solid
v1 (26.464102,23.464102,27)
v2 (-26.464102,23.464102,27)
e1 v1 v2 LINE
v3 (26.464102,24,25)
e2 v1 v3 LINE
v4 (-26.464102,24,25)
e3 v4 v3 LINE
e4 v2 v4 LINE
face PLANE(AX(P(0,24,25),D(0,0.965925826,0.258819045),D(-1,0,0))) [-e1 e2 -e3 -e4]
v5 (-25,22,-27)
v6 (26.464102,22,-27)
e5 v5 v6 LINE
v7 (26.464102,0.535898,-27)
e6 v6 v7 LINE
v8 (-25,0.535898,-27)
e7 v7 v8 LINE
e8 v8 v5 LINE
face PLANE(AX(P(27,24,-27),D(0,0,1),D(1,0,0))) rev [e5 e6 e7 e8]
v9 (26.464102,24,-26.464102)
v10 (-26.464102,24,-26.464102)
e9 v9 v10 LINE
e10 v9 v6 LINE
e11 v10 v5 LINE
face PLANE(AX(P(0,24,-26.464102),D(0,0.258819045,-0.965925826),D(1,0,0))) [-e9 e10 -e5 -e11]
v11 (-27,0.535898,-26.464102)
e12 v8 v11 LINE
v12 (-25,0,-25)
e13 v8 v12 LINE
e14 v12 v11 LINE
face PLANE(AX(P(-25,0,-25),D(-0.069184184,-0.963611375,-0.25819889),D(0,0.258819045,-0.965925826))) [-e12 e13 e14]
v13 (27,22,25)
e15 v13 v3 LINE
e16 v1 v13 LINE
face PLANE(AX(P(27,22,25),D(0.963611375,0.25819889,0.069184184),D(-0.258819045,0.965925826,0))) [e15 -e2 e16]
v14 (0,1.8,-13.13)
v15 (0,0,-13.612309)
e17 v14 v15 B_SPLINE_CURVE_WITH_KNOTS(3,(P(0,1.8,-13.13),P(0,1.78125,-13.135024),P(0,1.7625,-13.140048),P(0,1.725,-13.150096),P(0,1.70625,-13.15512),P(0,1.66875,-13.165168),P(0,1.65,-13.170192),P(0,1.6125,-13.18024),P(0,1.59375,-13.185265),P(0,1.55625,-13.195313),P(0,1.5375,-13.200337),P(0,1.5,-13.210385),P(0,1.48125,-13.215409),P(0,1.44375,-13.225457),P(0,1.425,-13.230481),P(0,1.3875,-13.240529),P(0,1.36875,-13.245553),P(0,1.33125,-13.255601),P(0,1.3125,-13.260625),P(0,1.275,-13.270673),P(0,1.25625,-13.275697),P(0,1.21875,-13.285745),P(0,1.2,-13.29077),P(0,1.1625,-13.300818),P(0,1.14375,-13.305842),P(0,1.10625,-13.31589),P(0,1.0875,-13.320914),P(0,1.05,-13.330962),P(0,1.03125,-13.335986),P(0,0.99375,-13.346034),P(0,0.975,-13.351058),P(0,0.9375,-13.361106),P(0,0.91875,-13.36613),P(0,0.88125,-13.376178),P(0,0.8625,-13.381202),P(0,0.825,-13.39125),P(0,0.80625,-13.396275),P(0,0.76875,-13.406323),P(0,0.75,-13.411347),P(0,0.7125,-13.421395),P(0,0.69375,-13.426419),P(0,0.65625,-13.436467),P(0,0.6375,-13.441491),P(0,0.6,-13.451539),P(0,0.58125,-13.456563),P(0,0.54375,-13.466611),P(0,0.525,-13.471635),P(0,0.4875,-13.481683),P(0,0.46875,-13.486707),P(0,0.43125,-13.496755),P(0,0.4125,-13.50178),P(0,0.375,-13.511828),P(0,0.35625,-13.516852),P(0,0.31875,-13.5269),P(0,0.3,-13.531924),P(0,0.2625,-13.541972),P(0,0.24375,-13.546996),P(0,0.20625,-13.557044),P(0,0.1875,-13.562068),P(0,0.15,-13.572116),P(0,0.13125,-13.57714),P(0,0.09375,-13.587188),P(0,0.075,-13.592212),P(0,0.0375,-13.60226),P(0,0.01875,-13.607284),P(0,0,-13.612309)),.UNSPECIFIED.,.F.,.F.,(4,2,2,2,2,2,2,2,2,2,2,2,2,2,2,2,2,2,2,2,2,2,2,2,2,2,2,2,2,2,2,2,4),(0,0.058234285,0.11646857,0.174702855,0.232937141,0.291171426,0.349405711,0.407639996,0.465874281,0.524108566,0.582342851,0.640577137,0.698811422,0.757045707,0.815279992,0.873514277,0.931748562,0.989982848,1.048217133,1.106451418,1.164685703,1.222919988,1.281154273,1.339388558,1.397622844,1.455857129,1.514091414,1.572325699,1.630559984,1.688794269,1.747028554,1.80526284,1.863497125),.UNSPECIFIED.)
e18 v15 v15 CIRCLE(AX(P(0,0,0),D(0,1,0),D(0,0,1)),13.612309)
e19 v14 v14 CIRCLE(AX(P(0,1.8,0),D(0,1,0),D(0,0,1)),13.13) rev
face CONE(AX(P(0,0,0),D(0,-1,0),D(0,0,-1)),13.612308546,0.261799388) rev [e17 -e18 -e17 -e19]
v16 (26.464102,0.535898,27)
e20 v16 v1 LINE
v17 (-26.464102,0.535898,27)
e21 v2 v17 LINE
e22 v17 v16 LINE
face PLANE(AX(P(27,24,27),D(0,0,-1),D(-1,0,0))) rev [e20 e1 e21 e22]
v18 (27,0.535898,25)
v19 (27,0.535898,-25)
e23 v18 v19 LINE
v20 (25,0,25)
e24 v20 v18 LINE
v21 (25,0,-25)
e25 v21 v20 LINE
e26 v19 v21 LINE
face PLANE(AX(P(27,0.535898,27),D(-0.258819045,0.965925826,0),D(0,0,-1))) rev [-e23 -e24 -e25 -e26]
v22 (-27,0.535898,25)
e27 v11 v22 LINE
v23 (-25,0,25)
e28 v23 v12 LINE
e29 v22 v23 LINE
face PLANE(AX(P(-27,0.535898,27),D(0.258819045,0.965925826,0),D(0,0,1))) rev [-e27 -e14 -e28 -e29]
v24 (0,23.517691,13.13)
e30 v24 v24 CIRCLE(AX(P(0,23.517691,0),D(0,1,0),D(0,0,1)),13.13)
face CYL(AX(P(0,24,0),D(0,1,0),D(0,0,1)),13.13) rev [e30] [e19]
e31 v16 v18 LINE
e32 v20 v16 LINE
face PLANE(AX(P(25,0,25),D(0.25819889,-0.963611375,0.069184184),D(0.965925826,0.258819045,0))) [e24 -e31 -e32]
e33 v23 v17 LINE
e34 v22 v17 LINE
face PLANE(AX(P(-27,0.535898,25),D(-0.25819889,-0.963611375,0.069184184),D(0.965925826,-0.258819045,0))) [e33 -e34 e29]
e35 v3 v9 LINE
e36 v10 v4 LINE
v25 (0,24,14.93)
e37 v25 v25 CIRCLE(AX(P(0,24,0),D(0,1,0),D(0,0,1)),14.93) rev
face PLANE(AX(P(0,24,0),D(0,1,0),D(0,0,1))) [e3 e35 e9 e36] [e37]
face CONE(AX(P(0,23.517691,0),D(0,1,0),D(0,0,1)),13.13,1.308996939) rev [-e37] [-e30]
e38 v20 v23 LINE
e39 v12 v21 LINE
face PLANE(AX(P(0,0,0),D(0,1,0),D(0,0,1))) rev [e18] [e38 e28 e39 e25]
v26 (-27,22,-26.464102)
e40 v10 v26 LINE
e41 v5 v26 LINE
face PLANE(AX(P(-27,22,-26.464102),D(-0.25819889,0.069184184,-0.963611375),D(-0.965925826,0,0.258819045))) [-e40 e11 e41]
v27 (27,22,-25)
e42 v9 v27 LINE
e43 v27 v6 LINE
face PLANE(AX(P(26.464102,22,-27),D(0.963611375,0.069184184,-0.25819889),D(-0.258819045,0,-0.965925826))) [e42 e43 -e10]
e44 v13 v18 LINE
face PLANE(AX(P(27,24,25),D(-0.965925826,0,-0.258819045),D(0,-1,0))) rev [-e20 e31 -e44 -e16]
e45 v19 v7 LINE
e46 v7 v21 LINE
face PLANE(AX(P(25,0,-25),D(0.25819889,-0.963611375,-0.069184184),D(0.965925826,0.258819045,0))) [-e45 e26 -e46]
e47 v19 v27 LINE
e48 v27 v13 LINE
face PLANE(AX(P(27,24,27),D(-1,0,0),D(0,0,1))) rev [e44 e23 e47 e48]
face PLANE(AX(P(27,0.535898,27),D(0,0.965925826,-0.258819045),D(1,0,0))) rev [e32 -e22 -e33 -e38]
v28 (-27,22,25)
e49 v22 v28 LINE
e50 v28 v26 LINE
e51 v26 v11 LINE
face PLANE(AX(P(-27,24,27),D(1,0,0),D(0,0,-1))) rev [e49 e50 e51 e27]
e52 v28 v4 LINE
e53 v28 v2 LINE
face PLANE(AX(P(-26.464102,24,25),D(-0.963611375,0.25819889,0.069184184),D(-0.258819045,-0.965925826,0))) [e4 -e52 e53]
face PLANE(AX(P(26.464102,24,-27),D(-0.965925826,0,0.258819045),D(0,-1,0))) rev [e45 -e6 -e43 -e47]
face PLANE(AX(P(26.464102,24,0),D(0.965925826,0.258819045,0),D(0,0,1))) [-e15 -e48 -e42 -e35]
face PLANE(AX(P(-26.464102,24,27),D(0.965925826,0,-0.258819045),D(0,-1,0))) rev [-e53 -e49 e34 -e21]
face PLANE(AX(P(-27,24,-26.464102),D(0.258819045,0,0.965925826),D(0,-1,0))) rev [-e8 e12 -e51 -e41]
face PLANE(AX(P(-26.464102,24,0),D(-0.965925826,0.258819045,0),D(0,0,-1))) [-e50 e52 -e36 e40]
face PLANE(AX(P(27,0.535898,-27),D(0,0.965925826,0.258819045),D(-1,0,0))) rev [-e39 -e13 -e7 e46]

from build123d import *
from OCP.BRepFilletAPI import BRepFilletAPI_MakeChamfer

# Parameters (mm, degrees)
SKETCH1_W             = 54
SKETCH1_H             = 54
BOSS_EXTRUDE1_DEPTH   = 24
M24_CLEARANCE_HOLE1_D = 26.26
CHAMFER2_SIZE         = 1.8
CHAMFER2_SIZE2        = 0.482308546


with BuildPart() as part:
    # Sketch1 → Boss-Extrude1 (new body)
    with BuildSketch(Plane(origin=(0, 0, 0), x_dir=(1, 0, 0), z_dir=(0, 1, 0))):
        Rectangle(SKETCH1_W, SKETCH1_H)
    extrude(amount=BOSS_EXTRUDE1_DEPTH)

    # Chamfer1
    # the kernel refuses this chamfer: 2, 0.535898385 mm, written as the material it takes off along each edge
    with BuildSketch(Plane(origin=(26.64273441, 22.666666667, -26.154700538), x_dir=(0.25881904510252285, 0, 0.9659258262890678), z_dir=(0.9636113749942796, 0.0691841839943633, -0.2581988897471632)), Plane(origin=(-26.154700538, 22.666666667, -26.64273441), x_dir=(0.9659258262890678, 0, -0.25881904510252285), z_dir=(-0.2581988897471632, 0.0691841839943633, -0.9636113749942796))) as chamfer1_piece_1:
        Polygon((-0.86273015, 0.668267901), (1.20782221, 0.668267901), (-0.34509206, -1.336535802), align=None)
    extrude(amount=0.720242762, mode=Mode.SUBTRACT)
    with BuildSketch(Plane(origin=(26.64273441, 23.154700538, 25.666666667), x_dir=(0.21132486540518758, -0.5773502691896254, -0.788675134594813), z_dir=(0.9636113749942801, 0.2581988897471616, 0.06918418399436459))) as chamfer1_piece_2:
        Polygon((-1.267949192, -0.545638456), (1.267949192, -0.545638456), (0, 1.091276912), align=None)
    extrude(amount=0.720242762, mode=Mode.SUBTRACT)
    with BuildSketch(Plane(origin=(26.154700538, 0.35726559, -25.666666667), x_dir=(0.25881904510252285, 0, 0.9659258262890678), z_dir=(0.2581988897471617, -0.9636113749942801, -0.06918418399436507)), Plane(origin=(-25.666666667, 0.35726559, -26.154700538), x_dir=(0.9659258262890678, 0, -0.25881904510252285), z_dir=(-0.06918418399436507, -0.9636113749942801, -0.2581988897471617)), Plane(origin=(-26.154700538, 0.35726559, 25.666666667), x_dir=(-0.25881904510252124, 0, -0.9659258262890682), z_dir=(-0.2581988897471617, -0.9636113749942801, 0.0691841839943646))) as chamfer1_piece_3:
        Polygon((-1.20782221, -0.668267901), (0.86273015, -0.668267901), (0.34509206, 1.336535802), align=None)
    extrude(amount=0.720242762, mode=Mode.SUBTRACT)
    with BuildSketch(Plane(origin=(26.154700538, 0.35726559, 25.666666667), x_dir=(0.25881904510252124, 0, -0.9659258262890682), z_dir=(0.2581988897471617, -0.9636113749942801, 0.0691841839943646))) as chamfer1_piece_4:
        Polygon((-1.20782221, 0.668267901), (0.86273015, 0.668267901), (0.34509206, -1.336535802), align=None)
    extrude(amount=0.720242762, mode=Mode.SUBTRACT)
    with BuildSketch(Plane(origin=(-26.64273441, 23.154700538, 25.666666667), x_dir=(-0.21132486540518758, -0.5773502691896254, -0.788675134594813), z_dir=(-0.9636113749942801, 0.2581988897471616, 0.06918418399436459))) as chamfer1_piece_5:
        Polygon((-1.267949192, 0.545638456), (1.267949192, 0.545638456), (0, -1.091276912), align=None)
    extrude(amount=0.720242762, mode=Mode.SUBTRACT)
    with BuildSketch(Plane(origin=(27, 24, -32.19344314), x_dir=(0.009967146577157254, -0.9999503267608395, 0), z_dir=(0, 0, 1)), Plane(origin=(-32.19344314, 24, -27), x_dir=(0, -0.9999503267608395, -0.009967146577157254), z_dir=(1, 0, 0)), Plane(origin=(-27, 24, 32.19344314), x_dir=(-0.009967146577157254, -0.9999503267608395, 0), z_dir=(0, 0, -1))) as chamfer1_piece_6:
        with BuildLine():
            Line((2.077377256, 0), (-0.08281798, -0.555806058))
            Line((-0.08281798, -0.555806058), (-0.122815993, -0.555407372))
            ThreePointArc((-0.122815993, -0.555407372), (-0.042771889, -0.277889444), (-0.039998013, 0.000398686))
            Line((-0.039998013, 0.000398686), (0.000398686, 0.039998013))
            ThreePointArc((0.000398686, 0.039998013), (1.038984126, 0.029645766), (2.077775942, 0.039998013))
            Line((2.077775942, 0.039998013), (2.077377256, 0))
        make_face()
    extrude(amount=64.386886281, mode=Mode.SUBTRACT)
    with BuildSketch(Plane(origin=(27, -5.19344314, -27), x_dir=(-0.9905000388259545, 0, -0.13751244702128856), z_dir=(0, 1, 0)), Plane(origin=(-27, -5.19344314, -27), x_dir=(-0.13751244702128856, 0, 0.9905000388259545), z_dir=(0, 1, 0)), Plane(origin=(-27, -5.19344314, 27), x_dir=(0.9905000388259545, 0, 0.13751244702128856), z_dir=(0, 1, 0))) as chamfer1_piece_7:
        with BuildLine():
            Line((0.561942339, 0), (-0.306159862, 2.054692776))
            Line((-0.306159862, 2.054692776), (-0.345779863, 2.049192278))
            ThreePointArc((-0.345779863, 2.049192278), (-0.182445522, 1.023269524), (-0.039620002, -0.005500498))
            Line((-0.039620002, -0.005500498), (0.005500498, -0.039620002))
            ThreePointArc((0.005500498, -0.039620002), (0.281158594, -0.001350019), (0.567442837, -0.039620002))
            Line((0.567442837, -0.039620002), (0.561942339, 0))
        make_face()
    extrude(amount=34.386886281, mode=Mode.SUBTRACT)
    with BuildSketch(Plane(origin=(27, -5.19344314, 27), x_dir=(-0.9905000388259544, 0, 0.13751244702128942), z_dir=(0, 1, 0))) as chamfer1_piece_8:
        with BuildLine():
            Line((0.561942339, 0), (-0.306159862, -2.054692776))
            Line((-0.306159862, -2.054692776), (-0.345779863, -2.049192278))
            ThreePointArc((-0.345779863, -2.049192278), (-0.182445522, -1.023269524), (-0.039620002, 0.005500498))
            Line((-0.039620002, 0.005500498), (0.005500498, 0.039620002))
            ThreePointArc((0.005500498, 0.039620002), (0.281158594, 0.001350019), (0.567442837, 0.039620002))
            Line((0.567442837, 0.039620002), (0.561942339, 0))
        make_face()
    extrude(amount=34.386886281, mode=Mode.SUBTRACT)
    with BuildSketch(Plane(origin=(-32.19344314, 0, -27), x_dir=(0, 0.9905000388259544, -0.1375124470212898), z_dir=(1, 0, 0)), Plane(origin=(27, 0, -32.19344314), x_dir=(0.13751244702128979, 0.9905000388259542, 0), z_dir=(0, 0, 1)), Plane(origin=(32.19344314, 0, 27), x_dir=(0, 0.9905000388259544, 0.1375124470212898), z_dir=(-1, 0, 0)), Plane(origin=(-27, 0, 32.19344314), x_dir=(-0.13751244702128979, 0.9905000388259542, 0), z_dir=(0, 0, -1))) as chamfer1_piece_9:
        with BuildLine():
            Line((0.561942339, 0), (-0.306159862, 2.054692776))
            Line((-0.306159862, 2.054692776), (-0.345779863, 2.049192278))
            ThreePointArc((-0.345779863, 2.049192278), (-0.182445522, 1.023269524), (-0.039620002, -0.005500498))
            Line((-0.039620002, -0.005500498), (0.005500498, -0.039620002))
            ThreePointArc((0.005500498, -0.039620002), (0.281158594, -0.001350019), (0.567442837, -0.039620002))
            Line((0.567442837, -0.039620002), (0.561942339, 0))
        make_face()
    extrude(amount=64.386886281, mode=Mode.SUBTRACT)
    with BuildSketch(Plane(origin=(32.19344314, 24, 27), x_dir=(0, -0.9905000388259544, 0.13751244702128942), z_dir=(-1, 0, 0))) as chamfer1_piece_10:
        with BuildLine():
            Line((0.561942339, 0), (-0.306159862, -2.054692776))
            Line((-0.306159862, -2.054692776), (-0.345779863, -2.049192278))
            ThreePointArc((-0.345779863, -2.049192278), (-0.182445522, -1.023269524), (-0.039620002, 0.005500498))
            Line((-0.039620002, 0.005500498), (0.005500498, 0.039620002))
            ThreePointArc((0.005500498, 0.039620002), (0.281158594, 0.001350019), (0.567442837, 0.039620002))
            Line((0.567442837, 0.039620002), (0.561942339, 0))
        make_face()
    extrude(amount=64.386886281, mode=Mode.SUBTRACT)

    # M24 Clearance Hole1 (through all)
    with Locations(Plane(origin=(0, 24, 0), x_dir=(1, 0, 0), z_dir=(0, 1, 0))):
        with Locations((0, 0)):
            Hole(M24_CLEARANCE_HOLE1_D / 2)

    # Chamfer2: one chamfer whose edges measure the first distance from different faces: ONE call of the kernel's chamfer builder (chamfer() names one face for all edges)
    chamfer2_edges_1 = [part.edges().sort_by_distance(p)[0] for p in [
        (13.13, 24, 0),
    ]]
    chamfer2_side_1 = [part.faces().sort_by_distance(p)[0] for p in [
        (0, 24, -25.725863953),
    ]]
    chamfer2_edges_2 = [part.edges().sort_by_distance(p)[0] for p in [
        (13.13, 0, 0),
    ]]
    chamfer2_side_2 = [part.faces().sort_by_distance(p)[0] for p in [
        (13.13, 12, 0),
    ]]
    chamfer2 = BRepFilletAPI_MakeChamfer(part.part.solid().wrapped)
    for e in chamfer2_edges_1:
        chamfer2.Add(CHAMFER2_SIZE, CHAMFER2_SIZE2, e.wrapped, chamfer2_side_1[0].wrapped)  # the first distance lies on this face
    for e in chamfer2_edges_2:
        chamfer2.Add(CHAMFER2_SIZE, CHAMFER2_SIZE2, e.wrapped, chamfer2_side_2[0].wrapped)  # the first distance lies on this face
    add(Compound.cast(chamfer2.Shape()), mode=Mode.REPLACE)


solid = part.part
